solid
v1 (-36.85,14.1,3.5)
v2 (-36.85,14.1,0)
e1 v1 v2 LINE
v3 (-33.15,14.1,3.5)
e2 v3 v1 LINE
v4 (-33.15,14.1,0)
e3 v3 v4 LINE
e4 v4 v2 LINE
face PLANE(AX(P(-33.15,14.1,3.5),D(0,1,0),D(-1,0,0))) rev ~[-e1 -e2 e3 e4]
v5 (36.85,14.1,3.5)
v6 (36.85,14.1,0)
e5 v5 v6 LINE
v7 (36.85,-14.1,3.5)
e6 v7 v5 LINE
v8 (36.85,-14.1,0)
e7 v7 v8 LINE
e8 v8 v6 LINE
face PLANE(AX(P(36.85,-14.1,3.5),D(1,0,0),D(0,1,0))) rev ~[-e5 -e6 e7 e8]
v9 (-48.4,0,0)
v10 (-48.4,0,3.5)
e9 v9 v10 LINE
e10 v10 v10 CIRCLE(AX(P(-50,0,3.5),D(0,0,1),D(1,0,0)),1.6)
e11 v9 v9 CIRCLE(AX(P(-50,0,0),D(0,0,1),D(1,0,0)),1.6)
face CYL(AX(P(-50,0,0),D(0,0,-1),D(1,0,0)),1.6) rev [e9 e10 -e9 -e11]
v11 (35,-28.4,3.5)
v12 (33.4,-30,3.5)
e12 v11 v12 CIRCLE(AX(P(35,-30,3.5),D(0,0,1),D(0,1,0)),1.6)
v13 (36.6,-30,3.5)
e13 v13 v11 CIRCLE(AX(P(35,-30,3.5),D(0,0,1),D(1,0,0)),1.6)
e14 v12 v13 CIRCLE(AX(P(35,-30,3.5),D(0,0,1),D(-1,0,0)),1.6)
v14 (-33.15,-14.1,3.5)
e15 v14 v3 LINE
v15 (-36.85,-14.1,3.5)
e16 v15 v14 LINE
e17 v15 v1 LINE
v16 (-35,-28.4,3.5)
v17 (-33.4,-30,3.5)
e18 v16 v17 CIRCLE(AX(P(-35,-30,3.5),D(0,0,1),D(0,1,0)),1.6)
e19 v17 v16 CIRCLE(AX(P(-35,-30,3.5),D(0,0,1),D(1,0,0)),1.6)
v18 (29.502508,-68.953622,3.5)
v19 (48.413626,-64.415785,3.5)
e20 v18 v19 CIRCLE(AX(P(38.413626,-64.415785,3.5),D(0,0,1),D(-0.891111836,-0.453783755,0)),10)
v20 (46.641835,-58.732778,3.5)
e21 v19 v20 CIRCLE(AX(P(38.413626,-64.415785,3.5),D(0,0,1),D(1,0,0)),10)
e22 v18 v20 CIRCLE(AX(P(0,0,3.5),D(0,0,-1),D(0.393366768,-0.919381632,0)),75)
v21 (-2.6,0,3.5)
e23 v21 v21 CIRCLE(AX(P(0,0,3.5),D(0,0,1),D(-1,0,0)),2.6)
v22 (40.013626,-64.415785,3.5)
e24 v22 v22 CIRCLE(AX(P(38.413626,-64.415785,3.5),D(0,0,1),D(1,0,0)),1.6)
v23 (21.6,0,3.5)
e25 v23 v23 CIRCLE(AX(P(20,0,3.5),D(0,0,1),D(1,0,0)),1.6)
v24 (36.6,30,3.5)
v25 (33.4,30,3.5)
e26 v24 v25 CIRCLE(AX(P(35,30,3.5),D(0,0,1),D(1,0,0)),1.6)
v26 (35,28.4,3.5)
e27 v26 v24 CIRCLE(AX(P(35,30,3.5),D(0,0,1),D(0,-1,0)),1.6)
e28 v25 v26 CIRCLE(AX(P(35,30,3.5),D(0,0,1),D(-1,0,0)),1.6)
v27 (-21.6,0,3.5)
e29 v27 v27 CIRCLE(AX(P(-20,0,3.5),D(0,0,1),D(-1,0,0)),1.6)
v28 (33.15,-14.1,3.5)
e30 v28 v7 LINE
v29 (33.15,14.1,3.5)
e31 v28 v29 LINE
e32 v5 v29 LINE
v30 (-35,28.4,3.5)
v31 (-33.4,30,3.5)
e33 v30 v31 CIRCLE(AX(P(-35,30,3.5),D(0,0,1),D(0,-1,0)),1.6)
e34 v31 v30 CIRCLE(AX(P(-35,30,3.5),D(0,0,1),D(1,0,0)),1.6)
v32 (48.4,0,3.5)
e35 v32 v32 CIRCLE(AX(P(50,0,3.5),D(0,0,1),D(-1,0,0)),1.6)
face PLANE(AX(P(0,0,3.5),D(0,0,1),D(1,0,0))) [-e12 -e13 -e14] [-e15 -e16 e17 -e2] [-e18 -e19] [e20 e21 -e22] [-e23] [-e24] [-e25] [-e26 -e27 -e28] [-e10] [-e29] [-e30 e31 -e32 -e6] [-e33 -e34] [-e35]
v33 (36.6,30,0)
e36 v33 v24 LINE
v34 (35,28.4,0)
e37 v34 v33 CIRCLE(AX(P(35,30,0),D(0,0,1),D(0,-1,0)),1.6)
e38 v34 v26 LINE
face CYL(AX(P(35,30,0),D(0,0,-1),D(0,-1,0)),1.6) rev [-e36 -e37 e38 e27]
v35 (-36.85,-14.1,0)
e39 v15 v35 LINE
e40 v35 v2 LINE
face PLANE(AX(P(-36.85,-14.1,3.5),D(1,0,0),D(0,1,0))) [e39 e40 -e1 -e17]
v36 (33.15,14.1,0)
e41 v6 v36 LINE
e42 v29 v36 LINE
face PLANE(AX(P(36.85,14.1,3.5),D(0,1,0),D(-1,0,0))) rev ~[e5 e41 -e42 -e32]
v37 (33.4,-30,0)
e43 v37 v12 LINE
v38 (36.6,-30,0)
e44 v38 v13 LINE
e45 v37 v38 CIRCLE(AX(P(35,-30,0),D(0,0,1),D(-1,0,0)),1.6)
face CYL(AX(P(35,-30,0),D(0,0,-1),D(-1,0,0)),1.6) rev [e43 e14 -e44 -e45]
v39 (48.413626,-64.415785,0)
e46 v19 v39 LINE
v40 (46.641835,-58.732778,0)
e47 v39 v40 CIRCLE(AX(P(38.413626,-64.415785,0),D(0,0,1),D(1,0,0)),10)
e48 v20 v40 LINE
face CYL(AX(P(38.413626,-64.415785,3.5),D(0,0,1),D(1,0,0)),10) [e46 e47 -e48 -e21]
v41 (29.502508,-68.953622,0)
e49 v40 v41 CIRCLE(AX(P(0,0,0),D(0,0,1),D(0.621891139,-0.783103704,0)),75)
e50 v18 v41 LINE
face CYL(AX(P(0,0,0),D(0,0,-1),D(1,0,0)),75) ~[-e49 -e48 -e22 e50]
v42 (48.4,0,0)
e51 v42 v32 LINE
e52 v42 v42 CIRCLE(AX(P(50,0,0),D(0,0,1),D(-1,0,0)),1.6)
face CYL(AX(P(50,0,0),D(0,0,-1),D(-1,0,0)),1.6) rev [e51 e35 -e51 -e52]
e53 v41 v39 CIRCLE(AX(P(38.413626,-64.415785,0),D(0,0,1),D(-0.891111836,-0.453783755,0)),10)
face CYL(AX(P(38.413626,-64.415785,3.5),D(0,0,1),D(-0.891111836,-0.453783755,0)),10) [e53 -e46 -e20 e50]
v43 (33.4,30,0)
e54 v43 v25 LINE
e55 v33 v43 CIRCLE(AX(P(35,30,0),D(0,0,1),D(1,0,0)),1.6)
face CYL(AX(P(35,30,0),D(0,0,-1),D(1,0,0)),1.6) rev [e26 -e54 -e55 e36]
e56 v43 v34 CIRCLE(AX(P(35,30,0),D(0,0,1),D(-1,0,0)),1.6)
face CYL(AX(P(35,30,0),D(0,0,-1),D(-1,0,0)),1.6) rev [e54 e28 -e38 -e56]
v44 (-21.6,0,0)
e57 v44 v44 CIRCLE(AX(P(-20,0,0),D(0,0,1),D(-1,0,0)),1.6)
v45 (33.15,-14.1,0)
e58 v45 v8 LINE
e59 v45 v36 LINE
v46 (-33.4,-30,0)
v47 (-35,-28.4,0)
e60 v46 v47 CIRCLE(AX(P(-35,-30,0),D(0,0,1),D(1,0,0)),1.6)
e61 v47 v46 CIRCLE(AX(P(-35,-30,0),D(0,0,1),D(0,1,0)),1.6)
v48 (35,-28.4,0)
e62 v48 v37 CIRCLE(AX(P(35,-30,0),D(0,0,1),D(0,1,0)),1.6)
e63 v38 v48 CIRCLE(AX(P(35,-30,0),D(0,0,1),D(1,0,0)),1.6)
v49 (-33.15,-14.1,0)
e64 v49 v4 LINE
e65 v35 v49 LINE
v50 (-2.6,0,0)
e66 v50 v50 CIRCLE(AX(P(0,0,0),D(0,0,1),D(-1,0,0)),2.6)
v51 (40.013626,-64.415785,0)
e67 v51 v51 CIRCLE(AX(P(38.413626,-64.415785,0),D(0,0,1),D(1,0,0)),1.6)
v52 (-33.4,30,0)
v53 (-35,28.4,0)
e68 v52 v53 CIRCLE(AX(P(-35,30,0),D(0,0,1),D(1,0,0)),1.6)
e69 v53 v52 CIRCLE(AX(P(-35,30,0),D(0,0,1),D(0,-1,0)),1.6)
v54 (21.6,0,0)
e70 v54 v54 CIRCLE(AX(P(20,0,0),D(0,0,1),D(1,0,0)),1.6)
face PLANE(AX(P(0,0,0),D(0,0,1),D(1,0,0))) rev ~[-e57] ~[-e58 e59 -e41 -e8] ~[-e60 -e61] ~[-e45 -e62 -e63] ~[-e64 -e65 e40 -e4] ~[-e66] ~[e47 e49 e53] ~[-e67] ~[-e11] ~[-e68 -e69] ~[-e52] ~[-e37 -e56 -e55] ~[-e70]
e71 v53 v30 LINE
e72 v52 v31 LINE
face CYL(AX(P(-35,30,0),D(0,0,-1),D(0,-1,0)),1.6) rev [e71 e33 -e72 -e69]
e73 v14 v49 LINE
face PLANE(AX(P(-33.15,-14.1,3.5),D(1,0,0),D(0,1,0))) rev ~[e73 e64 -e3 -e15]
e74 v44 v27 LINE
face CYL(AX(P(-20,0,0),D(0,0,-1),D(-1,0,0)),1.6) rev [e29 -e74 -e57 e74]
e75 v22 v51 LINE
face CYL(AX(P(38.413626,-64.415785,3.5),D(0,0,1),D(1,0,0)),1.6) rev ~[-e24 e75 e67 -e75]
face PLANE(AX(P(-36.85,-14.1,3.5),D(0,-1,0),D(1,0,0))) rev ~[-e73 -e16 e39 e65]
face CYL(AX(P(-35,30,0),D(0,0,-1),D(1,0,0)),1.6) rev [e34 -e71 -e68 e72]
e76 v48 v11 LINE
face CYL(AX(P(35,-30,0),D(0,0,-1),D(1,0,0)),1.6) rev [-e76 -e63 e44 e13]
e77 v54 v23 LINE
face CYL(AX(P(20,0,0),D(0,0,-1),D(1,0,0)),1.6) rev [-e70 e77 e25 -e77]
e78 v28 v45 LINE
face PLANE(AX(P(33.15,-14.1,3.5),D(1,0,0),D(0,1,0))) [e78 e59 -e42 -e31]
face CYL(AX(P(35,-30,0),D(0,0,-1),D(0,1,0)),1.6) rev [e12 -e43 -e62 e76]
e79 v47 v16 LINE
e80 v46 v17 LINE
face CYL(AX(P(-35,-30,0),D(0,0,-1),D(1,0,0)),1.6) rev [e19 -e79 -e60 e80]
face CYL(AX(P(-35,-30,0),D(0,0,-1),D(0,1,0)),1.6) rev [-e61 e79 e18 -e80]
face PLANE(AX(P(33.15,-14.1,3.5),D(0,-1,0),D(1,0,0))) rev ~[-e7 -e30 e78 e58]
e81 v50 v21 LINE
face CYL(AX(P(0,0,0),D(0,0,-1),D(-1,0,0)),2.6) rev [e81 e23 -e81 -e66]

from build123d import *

# Parameters (mm, degrees)
F0_R     = 75
F1_DEPTH = 3.5
F2_R     = 1.6
F3_DEPTH = 3.5
F5_DEPTH = 3.5
F6_R     = 1.6
F7_DEPTH = 3.5
F8_W     = 1.85
F8_H     = 28.2
F9_DEPTH = 3.501


with BuildPart() as f1:
    # F0 (on Top) → F1 (new body)
    with BuildSketch(Plane.XY):
        Circle(F0_R)
    extrude(amount=F1_DEPTH)

    # F2 (on Top) → F3 (cut)
    with BuildSketch(Plane.XY):
        with BuildLine():
            ThreePointArc((-35, -28.4), (-36.1313708499, -31.1313708499), (-33.4, -30))
            Line((-33.4, -30), (-35, -30))
            Line((-35, -30), (-35, -28.4))
        make_face()
        with BuildLine():
            Line((-35, -30), (-33.4, -30))
            ThreePointArc((-33.4, -30), (-33.8686291501, -28.8686291501), (-35, -28.4))
            Line((-35, -28.4), (-35, -30))
        make_face()
        with Locations((-50, 0)):
            Circle(F2_R)
        with BuildLine():
            ThreePointArc((51.6, 0), (50, 1.6), (48.4, 0))
            ThreePointArc((48.4, 0), (50, -1.6), (51.6, 0))
        make_face()
        with BuildLine():
            ThreePointArc((35, -28.4), (33.8686291501, -28.8686291501), (33.4, -30))
            Line((33.4, -30), (35, -30))
            Line((35, -30), (35, -28.4))
        make_face()
        with BuildLine():
            Line((35, -30), (33.4, -30))
            ThreePointArc((33.4, -30), (35, -31.6), (36.6, -30))
            ThreePointArc((36.6, -30), (36.1313708499, -28.8686291501), (35, -28.4))
            Line((35, -28.4), (35, -30))
        make_face()
        with BuildLine():
            ThreePointArc((-33.4, 30), (-36.1313708499, 31.1313708499), (-35, 28.4))
            Line((-35, 28.4), (-35, 30))
            Line((-35, 30), (-33.4, 30))
        make_face()
        with BuildLine():
            Line((-35, 30), (-35, 28.4))
            ThreePointArc((-35, 28.4), (-33.8686291501, 28.8686291501), (-33.4, 30))
            Line((-33.4, 30), (-35, 30))
        make_face()
        with BuildLine():
            ThreePointArc((-18.4, 0), (-20, 1.6), (-21.6, 0))
            Line((-21.6, 0), (-20, 0))
            Line((-20, 0), (-18.4, 0))
        make_face()
        with BuildLine():
            Line((-20, 0), (-21.6, 0))
            ThreePointArc((-21.6, 0), (-20, -1.6), (-18.4, 0))
            Line((-18.4, 0), (-20, 0))
        make_face()
        with BuildLine():
            ThreePointArc((33.4, 30), (33.8686291501, 28.8686291501), (35, 28.4))
            Line((35, 28.4), (35, 30))
            Line((35, 30), (33.4, 30))
        make_face()
        with BuildLine():
            Line((35, 30), (35, 28.4))
            ThreePointArc((35, 28.4), (36.1313708499, 28.8686291501), (36.6, 30))
            ThreePointArc((36.6, 30), (35, 31.6), (33.4, 30))
            Line((33.4, 30), (35, 30))
        make_face()
        with BuildLine():
            ThreePointArc((18.4, 0), (20, -1.6), (21.6, 0))
            Line((21.6, 0), (20, 0))
            Line((20, 0), (18.4, 0))
        make_face()
        with BuildLine():
            Line((20, 0), (21.6, 0))
            ThreePointArc((21.6, 0), (20, 1.6), (18.4, 0))
            Line((18.4, 0), (20, 0))
        make_face()
        with BuildLine():
            ThreePointArc((2.6, 0), (0, 2.6), (-2.6, 0))
            Line((-2.6, 0), (2.6, 0))
        make_face()
        with BuildLine():
            Line((2.6, 0), (-2.6, 0))
            ThreePointArc((-2.6, 0), (0, -2.6), (2.6, 0))
        make_face()
    extrude(amount=F3_DEPTH, mode=Mode.SUBTRACT)

    # F4 (on face) → F5 (join)
    with BuildSketch(Plane.XY.offset(3.5)):
        with BuildLine():
            ThreePointArc((29.5025076199, -68.9536224149), (40.7469515469, -74.139754822), (48.4136259754, -64.4157848623))
            ThreePointArc((48.4136259754, -64.4157848623), (47.9604080116, -61.4393855689), (46.6418354247, -58.732777801))
            ThreePointArc((46.6418354247, -58.732777801), (38.4136259754, -64.4157848623), (29.5025076199, -68.9536224149))
        make_face()
    extrude(amount=-F5_DEPTH)

    # F6 (on face) → F7 (cut)
    with BuildSketch(Plane.XY.offset(3.5)):
        with Locations((38.4136259754, -64.4157848623)):
            Circle(F6_R)
    extrude(amount=-F7_DEPTH, mode=Mode.SUBTRACT)

    # F8 (on face) → F9 (cut, through all)
    with BuildSketch(Plane.XY.offset(3.5)):
        with Locations((-34.075, 0)):
            Rectangle(F8_W, F8_H)
        with Locations((-35.925, 0)):
            Rectangle(F8_W, F8_H)
        with Locations((35.925, 0)):
            Rectangle(F8_W, F8_H)
        with Locations((34.075, 0)):
            Rectangle(F8_W, F8_H)
    extrude(amount=-F9_DEPTH, mode=Mode.SUBTRACT)


solid = f1.part
